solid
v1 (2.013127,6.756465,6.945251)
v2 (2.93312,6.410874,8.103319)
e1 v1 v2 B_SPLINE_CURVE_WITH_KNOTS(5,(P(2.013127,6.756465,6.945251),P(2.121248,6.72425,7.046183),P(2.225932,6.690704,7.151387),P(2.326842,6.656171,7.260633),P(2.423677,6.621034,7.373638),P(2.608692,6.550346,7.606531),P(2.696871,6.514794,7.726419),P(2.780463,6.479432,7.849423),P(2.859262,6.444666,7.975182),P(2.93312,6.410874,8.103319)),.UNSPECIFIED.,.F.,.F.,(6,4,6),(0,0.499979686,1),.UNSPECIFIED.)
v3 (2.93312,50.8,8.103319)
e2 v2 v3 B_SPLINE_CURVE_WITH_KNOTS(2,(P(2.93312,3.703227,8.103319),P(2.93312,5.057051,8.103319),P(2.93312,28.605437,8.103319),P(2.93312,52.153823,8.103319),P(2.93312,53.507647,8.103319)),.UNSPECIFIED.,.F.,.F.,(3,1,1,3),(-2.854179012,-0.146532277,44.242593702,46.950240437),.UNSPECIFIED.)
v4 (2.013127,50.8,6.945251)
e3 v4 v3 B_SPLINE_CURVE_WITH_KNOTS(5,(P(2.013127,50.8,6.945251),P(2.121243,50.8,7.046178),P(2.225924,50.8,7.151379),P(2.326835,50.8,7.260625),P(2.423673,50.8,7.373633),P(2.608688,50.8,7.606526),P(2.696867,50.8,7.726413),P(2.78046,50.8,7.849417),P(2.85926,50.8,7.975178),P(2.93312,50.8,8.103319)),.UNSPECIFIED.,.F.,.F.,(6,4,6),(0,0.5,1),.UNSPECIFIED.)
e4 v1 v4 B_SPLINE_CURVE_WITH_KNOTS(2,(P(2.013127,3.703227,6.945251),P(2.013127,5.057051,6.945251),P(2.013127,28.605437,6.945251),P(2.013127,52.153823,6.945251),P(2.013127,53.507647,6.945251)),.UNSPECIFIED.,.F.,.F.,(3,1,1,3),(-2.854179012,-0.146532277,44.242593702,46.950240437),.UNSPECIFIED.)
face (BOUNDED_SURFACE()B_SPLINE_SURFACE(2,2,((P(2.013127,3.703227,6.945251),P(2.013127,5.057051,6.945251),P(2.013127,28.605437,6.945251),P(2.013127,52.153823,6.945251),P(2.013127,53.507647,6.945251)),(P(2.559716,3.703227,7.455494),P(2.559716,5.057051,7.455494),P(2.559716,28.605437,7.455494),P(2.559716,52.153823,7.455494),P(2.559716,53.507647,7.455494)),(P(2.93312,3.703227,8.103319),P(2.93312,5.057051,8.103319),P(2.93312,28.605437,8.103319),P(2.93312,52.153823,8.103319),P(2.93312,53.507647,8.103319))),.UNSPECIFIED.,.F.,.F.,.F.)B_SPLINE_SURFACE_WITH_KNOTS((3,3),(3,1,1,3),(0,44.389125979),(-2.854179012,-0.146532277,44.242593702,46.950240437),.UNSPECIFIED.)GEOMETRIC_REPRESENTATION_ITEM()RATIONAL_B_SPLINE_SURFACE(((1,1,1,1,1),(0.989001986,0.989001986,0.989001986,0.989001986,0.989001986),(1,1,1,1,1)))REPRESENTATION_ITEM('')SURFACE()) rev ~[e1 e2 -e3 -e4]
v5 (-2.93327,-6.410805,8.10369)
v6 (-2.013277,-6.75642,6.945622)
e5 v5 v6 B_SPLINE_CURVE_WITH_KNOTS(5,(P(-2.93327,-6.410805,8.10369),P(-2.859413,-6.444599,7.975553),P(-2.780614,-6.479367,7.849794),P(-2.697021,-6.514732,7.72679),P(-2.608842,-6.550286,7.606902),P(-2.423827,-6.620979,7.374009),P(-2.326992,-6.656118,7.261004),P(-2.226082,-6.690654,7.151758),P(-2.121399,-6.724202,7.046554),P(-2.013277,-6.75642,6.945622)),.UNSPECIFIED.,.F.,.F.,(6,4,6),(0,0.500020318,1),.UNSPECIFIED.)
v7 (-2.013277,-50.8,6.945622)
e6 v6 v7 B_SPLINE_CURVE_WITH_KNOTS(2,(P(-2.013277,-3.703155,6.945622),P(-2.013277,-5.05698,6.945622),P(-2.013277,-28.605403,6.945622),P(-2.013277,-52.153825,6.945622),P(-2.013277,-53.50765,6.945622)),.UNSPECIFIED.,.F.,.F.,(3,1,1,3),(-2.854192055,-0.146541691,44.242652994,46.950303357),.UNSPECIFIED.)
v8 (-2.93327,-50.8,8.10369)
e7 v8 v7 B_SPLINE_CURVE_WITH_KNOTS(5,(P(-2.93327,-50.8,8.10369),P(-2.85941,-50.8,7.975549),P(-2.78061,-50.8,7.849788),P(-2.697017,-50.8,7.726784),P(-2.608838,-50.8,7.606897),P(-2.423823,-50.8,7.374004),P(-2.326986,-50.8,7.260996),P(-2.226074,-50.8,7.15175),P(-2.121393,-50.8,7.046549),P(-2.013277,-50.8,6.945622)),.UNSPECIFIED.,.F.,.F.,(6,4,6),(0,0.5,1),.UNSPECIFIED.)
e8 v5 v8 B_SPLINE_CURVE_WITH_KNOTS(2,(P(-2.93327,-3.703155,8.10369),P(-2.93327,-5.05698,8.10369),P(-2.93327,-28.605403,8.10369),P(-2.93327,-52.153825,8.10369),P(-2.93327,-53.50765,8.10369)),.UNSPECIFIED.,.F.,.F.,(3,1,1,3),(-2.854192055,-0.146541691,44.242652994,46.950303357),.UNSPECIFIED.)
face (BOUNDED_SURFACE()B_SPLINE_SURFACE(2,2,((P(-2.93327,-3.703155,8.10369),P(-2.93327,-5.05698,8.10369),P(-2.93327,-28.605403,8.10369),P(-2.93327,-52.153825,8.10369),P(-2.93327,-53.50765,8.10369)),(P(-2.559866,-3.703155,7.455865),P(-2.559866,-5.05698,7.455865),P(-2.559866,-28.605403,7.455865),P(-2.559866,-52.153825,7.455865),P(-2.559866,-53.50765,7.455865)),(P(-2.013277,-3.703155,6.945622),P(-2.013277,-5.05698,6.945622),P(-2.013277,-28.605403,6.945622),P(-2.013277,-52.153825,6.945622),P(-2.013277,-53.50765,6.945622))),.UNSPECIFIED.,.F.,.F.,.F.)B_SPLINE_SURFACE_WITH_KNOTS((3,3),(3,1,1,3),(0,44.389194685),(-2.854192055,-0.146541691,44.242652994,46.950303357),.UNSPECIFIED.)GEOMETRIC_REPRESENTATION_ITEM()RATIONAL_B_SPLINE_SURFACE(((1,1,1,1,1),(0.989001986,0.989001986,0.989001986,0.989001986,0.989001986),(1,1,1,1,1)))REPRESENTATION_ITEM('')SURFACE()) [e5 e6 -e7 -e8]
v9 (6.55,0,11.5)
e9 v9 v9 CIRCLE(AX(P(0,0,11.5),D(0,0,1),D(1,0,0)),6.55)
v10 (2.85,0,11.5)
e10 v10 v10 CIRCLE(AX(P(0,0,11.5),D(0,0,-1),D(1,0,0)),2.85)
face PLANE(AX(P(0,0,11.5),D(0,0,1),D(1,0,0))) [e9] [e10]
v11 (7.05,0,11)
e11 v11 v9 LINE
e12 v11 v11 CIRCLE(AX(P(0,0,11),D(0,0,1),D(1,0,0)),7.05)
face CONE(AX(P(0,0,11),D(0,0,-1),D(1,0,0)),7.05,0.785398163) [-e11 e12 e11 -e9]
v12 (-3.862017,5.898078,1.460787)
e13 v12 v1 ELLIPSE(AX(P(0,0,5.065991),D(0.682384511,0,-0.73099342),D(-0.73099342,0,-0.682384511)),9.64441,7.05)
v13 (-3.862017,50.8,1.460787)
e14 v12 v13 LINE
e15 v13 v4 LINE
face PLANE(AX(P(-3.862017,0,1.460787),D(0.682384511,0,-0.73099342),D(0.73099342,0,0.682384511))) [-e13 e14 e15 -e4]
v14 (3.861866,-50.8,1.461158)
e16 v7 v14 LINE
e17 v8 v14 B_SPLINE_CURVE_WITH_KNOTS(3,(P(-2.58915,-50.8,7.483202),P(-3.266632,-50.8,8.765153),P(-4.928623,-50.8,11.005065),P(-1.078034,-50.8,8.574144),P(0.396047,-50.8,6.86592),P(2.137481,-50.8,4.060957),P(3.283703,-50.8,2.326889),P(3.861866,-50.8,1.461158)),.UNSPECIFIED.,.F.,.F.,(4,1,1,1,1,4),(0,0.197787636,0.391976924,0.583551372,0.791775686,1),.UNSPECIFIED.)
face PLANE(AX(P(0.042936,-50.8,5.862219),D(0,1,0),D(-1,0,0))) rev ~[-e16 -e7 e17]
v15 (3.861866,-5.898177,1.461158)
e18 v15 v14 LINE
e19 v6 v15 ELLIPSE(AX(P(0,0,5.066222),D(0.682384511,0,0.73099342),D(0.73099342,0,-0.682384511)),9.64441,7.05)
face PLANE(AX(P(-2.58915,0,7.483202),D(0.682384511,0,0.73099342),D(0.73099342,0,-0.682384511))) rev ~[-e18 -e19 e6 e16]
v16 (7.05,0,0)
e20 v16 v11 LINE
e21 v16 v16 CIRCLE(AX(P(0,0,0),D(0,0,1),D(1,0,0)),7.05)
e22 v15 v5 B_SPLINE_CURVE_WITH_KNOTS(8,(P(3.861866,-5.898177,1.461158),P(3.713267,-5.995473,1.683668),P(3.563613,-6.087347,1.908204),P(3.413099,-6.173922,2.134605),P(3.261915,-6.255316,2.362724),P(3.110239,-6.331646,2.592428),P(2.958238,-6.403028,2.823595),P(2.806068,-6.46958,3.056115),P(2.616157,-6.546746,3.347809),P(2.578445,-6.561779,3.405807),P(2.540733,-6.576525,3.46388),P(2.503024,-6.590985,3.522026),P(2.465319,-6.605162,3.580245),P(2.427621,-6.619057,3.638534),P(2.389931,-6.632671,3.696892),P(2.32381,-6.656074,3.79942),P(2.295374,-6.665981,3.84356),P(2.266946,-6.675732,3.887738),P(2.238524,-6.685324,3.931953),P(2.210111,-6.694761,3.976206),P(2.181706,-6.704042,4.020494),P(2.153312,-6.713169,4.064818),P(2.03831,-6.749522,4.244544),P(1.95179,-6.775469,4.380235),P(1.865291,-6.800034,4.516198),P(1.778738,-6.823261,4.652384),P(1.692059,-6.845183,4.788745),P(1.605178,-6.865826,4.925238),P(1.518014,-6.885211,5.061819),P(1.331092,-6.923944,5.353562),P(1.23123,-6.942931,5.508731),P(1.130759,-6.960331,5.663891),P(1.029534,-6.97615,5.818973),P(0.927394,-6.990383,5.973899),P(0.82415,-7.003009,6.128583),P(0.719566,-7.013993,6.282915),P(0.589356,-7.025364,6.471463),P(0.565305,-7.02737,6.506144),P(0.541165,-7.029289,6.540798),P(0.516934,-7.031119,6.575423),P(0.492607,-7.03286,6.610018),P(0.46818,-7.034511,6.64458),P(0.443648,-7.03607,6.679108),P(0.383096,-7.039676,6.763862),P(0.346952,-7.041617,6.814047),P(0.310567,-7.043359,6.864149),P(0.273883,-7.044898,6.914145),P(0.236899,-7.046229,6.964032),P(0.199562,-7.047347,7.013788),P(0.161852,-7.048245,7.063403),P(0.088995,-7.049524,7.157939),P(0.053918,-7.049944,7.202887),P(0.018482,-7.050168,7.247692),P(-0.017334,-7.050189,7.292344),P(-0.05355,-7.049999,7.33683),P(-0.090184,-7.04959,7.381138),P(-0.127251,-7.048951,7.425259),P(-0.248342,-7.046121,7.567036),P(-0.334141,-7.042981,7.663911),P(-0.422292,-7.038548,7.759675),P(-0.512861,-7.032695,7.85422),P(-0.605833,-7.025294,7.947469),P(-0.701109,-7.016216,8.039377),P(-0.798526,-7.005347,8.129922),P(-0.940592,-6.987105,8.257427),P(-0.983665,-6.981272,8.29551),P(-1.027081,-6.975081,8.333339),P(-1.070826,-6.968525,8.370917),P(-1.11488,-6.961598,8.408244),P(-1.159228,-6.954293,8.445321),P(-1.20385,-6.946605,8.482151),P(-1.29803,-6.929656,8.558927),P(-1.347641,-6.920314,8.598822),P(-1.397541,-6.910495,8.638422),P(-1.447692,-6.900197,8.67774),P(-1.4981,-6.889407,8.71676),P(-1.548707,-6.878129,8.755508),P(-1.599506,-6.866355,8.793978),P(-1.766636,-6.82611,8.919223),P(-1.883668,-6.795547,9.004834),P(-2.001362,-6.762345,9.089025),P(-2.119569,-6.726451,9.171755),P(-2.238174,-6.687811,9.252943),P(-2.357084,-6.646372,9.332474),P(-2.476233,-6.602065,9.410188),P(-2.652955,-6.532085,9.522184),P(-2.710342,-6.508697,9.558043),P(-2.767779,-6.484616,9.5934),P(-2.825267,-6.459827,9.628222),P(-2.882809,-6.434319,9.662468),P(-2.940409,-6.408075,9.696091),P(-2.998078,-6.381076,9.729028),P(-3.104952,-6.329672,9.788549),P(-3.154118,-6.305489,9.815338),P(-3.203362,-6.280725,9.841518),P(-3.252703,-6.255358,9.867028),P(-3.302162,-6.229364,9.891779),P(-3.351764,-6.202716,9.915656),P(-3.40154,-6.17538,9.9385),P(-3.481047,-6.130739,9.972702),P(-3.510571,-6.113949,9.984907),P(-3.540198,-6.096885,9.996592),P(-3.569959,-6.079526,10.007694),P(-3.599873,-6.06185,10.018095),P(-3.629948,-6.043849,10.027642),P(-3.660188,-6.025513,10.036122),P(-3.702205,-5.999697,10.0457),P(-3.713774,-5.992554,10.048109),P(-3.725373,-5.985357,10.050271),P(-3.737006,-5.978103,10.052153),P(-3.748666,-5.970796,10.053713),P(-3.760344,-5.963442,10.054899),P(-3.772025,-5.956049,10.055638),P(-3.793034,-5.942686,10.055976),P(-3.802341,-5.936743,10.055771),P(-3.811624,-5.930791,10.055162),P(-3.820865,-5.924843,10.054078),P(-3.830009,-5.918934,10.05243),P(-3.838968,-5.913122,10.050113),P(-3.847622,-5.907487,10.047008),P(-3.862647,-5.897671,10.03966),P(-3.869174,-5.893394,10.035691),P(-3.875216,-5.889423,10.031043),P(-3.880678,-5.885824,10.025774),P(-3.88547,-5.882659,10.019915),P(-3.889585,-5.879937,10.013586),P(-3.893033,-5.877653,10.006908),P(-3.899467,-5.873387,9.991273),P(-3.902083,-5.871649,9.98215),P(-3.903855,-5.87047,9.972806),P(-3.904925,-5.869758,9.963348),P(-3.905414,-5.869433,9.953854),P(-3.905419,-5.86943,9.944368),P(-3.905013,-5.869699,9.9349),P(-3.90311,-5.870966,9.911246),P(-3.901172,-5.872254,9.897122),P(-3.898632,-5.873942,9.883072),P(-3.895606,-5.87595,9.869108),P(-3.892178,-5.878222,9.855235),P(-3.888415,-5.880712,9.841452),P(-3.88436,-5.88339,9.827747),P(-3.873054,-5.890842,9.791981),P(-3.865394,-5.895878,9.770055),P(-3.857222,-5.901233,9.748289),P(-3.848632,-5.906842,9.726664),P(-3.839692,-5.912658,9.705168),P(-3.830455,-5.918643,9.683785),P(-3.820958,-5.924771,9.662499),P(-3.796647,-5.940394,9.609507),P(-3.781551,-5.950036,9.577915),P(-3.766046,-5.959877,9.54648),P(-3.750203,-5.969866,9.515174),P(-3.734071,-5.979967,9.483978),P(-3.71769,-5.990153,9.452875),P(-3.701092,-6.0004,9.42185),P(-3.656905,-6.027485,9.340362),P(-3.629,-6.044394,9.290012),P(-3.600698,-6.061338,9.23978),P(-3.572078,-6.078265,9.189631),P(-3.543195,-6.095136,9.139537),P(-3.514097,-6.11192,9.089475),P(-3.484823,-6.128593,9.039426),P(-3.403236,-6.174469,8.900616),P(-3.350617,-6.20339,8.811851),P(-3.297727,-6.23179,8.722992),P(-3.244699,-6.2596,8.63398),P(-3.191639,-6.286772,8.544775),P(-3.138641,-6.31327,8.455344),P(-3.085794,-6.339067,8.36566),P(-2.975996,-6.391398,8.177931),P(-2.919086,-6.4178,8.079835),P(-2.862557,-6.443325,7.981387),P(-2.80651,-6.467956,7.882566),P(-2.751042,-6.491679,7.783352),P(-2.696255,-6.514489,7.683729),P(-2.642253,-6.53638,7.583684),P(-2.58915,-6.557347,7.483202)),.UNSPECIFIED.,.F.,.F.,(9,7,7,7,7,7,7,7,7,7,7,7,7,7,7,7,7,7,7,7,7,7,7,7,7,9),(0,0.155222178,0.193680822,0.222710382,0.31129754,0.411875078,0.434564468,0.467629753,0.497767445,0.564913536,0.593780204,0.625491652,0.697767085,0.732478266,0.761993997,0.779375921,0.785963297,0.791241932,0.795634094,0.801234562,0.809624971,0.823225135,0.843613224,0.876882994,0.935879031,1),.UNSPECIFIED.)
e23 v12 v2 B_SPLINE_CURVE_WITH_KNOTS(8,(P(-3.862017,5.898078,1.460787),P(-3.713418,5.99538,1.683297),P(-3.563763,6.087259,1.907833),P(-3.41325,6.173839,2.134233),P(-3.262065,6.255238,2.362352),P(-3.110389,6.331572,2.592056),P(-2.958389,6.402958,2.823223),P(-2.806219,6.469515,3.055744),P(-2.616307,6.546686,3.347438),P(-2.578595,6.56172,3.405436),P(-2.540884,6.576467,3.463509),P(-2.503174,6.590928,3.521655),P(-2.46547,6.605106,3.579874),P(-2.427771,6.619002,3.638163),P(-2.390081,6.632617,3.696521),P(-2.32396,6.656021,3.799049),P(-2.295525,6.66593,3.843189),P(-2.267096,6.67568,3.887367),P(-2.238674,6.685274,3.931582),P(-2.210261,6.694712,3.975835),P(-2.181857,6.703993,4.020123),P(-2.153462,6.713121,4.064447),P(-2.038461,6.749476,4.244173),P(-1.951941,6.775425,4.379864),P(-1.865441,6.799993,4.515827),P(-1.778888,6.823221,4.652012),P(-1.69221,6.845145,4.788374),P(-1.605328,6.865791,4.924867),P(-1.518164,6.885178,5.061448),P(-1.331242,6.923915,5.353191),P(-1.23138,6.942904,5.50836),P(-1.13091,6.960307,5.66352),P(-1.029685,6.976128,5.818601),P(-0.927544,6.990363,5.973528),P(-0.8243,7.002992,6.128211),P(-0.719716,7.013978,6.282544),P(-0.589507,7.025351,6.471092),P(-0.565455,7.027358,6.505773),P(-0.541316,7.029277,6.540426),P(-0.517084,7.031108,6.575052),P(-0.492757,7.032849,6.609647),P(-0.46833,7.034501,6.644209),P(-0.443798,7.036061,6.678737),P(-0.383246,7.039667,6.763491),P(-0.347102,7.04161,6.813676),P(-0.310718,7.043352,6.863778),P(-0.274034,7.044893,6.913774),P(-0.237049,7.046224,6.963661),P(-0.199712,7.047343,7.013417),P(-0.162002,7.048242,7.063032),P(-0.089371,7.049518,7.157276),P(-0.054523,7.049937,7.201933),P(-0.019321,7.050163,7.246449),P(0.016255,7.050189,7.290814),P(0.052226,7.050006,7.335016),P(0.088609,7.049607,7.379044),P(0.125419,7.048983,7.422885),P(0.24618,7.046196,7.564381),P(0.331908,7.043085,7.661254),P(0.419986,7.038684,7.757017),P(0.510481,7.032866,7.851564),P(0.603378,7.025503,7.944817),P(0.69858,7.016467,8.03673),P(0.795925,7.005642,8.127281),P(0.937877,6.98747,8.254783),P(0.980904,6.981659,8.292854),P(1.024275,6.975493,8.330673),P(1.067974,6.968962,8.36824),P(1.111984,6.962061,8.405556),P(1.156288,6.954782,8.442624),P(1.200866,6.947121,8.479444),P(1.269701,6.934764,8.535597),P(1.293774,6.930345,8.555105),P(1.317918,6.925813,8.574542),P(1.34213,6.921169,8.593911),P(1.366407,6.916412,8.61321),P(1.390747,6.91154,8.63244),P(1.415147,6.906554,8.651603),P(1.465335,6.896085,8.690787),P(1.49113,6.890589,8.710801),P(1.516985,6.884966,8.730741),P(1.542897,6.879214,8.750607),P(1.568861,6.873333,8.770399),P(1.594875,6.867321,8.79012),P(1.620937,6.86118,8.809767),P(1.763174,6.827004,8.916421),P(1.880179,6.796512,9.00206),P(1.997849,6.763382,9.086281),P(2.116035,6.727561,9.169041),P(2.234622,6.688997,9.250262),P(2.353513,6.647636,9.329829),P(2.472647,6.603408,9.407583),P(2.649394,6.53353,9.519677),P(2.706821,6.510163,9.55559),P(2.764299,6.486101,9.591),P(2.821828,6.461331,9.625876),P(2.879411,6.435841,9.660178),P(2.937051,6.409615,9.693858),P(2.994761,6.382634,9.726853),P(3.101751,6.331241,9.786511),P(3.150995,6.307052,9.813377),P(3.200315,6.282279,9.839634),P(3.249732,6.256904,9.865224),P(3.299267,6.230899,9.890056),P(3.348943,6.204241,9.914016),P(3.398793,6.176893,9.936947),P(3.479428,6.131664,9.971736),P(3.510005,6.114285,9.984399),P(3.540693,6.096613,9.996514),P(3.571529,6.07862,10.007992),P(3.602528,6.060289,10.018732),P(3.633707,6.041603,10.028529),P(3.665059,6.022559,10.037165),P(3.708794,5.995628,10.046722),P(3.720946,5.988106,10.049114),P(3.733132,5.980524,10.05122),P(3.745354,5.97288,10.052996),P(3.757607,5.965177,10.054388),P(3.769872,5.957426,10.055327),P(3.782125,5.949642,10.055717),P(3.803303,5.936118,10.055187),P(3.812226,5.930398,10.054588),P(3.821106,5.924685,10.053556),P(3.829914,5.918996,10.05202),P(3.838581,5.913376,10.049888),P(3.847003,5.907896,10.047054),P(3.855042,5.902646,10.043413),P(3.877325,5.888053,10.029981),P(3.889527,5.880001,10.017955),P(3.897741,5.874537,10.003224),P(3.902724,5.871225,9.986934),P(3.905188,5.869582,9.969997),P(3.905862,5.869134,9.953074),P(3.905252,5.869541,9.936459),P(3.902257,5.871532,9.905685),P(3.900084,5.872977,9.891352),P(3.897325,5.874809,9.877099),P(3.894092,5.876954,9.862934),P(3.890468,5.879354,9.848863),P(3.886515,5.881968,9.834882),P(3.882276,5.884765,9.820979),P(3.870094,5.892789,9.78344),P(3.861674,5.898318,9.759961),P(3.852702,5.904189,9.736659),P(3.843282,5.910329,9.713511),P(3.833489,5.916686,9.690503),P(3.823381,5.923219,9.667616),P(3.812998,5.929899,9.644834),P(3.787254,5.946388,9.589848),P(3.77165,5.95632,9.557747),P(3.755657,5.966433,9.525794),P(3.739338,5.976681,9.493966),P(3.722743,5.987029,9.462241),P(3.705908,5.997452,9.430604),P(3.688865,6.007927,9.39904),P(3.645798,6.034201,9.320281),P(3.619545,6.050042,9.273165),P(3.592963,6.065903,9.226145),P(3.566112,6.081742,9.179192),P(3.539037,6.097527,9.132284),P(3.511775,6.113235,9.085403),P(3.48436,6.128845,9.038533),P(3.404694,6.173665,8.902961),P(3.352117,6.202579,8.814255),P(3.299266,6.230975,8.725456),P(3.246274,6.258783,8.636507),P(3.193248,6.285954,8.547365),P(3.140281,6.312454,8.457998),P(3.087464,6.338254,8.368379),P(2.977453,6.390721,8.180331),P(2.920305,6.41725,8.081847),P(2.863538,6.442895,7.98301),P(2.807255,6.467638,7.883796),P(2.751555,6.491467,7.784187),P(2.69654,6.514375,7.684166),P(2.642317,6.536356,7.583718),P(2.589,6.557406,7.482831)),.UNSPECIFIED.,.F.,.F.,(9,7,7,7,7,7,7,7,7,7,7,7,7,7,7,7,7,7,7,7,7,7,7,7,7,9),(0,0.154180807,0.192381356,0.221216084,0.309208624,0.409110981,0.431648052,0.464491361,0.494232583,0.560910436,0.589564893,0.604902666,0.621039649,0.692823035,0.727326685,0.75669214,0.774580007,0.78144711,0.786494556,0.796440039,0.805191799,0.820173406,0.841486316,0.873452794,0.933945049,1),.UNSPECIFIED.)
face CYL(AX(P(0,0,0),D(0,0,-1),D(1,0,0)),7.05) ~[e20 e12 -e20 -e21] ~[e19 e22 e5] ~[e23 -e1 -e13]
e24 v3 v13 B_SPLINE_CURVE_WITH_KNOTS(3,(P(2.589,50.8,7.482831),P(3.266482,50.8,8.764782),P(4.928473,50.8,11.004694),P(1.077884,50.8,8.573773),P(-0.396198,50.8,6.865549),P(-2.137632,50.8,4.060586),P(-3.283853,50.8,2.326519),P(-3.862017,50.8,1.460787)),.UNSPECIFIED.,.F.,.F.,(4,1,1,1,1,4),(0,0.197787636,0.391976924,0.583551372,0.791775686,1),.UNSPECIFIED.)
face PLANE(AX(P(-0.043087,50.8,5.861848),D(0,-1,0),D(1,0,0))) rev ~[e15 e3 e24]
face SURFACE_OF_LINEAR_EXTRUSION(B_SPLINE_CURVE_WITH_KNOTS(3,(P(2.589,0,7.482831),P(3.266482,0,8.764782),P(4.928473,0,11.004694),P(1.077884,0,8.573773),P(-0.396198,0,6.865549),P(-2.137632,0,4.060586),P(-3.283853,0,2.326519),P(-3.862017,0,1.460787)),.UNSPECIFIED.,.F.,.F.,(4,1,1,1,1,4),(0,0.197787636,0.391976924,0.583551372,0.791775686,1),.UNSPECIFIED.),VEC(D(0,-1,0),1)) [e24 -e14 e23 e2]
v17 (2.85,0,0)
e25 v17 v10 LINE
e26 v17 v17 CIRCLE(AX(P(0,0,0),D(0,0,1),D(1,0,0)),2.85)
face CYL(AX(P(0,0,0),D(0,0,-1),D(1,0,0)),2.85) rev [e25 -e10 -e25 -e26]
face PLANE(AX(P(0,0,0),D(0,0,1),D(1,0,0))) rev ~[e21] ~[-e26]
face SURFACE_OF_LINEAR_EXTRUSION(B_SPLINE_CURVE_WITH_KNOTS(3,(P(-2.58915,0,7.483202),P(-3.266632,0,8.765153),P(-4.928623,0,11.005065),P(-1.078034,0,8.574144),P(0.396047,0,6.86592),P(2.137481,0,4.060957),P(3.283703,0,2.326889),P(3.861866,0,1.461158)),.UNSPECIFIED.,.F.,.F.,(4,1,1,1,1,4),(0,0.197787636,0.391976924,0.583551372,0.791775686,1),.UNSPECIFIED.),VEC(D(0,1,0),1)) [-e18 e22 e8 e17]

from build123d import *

# Parameters (mm, degrees)
F0_R     = 7.05
F0_R_2   = 2.85
F1_DEPTH = 11.5
F3_DEPTH = 50.8
F4_R     = 5
F6_DEPTH = 50.8
F7_R     = 5
F8_DEPTH = 25
F9_SIZE  = 0.5


# Not quite as in the source:
# - a feature names something its author has since deleted; it is built from what else it names


with BuildPart() as f1:
    # F0 (on Top) → F1 (new body)
    with BuildSketch(Plane.XY):
        Circle(F0_R)
        Circle(F0_R_2, mode=Mode.SUBTRACT)
        Circle(F0_R_2)
    extrude(amount=F1_DEPTH)

    # F2 (on Front) → F3 (join)
    with BuildSketch(Plane.XZ):
        with BuildLine():
            add(Edge.make_bspline(
                [(-2.5891504858, 7.4832015837), (-3.2666322949, 8.7651533189), (-4.9286231356, 11.0050647407), (-1.0780342653, 8.5741441522), (0.3960474288, 6.8659200901), (2.1374814031, 4.0609571357), (3.2837031791, 2.3268894658), (3.8618664427, 1.461158277)],
                knots=[0, 0, 0, 0, 0.1977876363, 0.3919769243, 0.5835513721, 0.7917756861, 1, 1, 1, 1], degree=3))
            Line((-2.5891504858, 7.4832015837), (3.8618664427, 1.461158277))
        make_face()
    extrude(amount=F3_DEPTH)

    # F4
    f4_edges = [f1.edges().sort_by_distance(p)[0] for p in [
        (-2.58915, -28.678674, 7.483202),
    ]]
    fillet(f4_edges, radius=F4_R)

    # F5 (on Front) → F6 (join)
    with BuildSketch(Plane.XZ):
        with BuildLine():
            Line((-3.8620166111, 1.4607873149), (2.5890003174, 7.4828306216))
            add(Edge.make_bspline(
                [(2.5890003174, 7.4828306216), (3.2664821265, 8.7647823568), (4.9284729672, 11.0046937785), (1.077884097, 8.5737731901), (-0.3961975972, 6.865549128), (-2.1376315715, 4.0605861736), (-3.2838533475, 2.3265185037), (-3.8620166111, 1.4607873149)],
                knots=[0, 0, 0, 0, 0.1977876363, 0.3919769243, 0.5835513721, 0.7917756861, 1, 1, 1, 1], degree=3))
        make_face()
    extrude(amount=-F6_DEPTH)

    # F7
    f7_edges = [f1.edges().sort_by_distance(p)[0] for p in [
        (2.589, 28.678703, 7.482831),
    ]]
    fillet(f7_edges, radius=F7_R)

    # F0 (on Top) → F8 (cut)
    with BuildSketch(Plane.XY):
        Circle(F0_R_2)
    extrude(amount=F8_DEPTH, mode=Mode.SUBTRACT)

    # F9
    f9_edges = [f1.edges().sort_by_distance(p)[0] for p in [
        (-7.05, 0, 11.5),
    ]]
    chamfer(f9_edges, length=F9_SIZE)


solid = f1.part
